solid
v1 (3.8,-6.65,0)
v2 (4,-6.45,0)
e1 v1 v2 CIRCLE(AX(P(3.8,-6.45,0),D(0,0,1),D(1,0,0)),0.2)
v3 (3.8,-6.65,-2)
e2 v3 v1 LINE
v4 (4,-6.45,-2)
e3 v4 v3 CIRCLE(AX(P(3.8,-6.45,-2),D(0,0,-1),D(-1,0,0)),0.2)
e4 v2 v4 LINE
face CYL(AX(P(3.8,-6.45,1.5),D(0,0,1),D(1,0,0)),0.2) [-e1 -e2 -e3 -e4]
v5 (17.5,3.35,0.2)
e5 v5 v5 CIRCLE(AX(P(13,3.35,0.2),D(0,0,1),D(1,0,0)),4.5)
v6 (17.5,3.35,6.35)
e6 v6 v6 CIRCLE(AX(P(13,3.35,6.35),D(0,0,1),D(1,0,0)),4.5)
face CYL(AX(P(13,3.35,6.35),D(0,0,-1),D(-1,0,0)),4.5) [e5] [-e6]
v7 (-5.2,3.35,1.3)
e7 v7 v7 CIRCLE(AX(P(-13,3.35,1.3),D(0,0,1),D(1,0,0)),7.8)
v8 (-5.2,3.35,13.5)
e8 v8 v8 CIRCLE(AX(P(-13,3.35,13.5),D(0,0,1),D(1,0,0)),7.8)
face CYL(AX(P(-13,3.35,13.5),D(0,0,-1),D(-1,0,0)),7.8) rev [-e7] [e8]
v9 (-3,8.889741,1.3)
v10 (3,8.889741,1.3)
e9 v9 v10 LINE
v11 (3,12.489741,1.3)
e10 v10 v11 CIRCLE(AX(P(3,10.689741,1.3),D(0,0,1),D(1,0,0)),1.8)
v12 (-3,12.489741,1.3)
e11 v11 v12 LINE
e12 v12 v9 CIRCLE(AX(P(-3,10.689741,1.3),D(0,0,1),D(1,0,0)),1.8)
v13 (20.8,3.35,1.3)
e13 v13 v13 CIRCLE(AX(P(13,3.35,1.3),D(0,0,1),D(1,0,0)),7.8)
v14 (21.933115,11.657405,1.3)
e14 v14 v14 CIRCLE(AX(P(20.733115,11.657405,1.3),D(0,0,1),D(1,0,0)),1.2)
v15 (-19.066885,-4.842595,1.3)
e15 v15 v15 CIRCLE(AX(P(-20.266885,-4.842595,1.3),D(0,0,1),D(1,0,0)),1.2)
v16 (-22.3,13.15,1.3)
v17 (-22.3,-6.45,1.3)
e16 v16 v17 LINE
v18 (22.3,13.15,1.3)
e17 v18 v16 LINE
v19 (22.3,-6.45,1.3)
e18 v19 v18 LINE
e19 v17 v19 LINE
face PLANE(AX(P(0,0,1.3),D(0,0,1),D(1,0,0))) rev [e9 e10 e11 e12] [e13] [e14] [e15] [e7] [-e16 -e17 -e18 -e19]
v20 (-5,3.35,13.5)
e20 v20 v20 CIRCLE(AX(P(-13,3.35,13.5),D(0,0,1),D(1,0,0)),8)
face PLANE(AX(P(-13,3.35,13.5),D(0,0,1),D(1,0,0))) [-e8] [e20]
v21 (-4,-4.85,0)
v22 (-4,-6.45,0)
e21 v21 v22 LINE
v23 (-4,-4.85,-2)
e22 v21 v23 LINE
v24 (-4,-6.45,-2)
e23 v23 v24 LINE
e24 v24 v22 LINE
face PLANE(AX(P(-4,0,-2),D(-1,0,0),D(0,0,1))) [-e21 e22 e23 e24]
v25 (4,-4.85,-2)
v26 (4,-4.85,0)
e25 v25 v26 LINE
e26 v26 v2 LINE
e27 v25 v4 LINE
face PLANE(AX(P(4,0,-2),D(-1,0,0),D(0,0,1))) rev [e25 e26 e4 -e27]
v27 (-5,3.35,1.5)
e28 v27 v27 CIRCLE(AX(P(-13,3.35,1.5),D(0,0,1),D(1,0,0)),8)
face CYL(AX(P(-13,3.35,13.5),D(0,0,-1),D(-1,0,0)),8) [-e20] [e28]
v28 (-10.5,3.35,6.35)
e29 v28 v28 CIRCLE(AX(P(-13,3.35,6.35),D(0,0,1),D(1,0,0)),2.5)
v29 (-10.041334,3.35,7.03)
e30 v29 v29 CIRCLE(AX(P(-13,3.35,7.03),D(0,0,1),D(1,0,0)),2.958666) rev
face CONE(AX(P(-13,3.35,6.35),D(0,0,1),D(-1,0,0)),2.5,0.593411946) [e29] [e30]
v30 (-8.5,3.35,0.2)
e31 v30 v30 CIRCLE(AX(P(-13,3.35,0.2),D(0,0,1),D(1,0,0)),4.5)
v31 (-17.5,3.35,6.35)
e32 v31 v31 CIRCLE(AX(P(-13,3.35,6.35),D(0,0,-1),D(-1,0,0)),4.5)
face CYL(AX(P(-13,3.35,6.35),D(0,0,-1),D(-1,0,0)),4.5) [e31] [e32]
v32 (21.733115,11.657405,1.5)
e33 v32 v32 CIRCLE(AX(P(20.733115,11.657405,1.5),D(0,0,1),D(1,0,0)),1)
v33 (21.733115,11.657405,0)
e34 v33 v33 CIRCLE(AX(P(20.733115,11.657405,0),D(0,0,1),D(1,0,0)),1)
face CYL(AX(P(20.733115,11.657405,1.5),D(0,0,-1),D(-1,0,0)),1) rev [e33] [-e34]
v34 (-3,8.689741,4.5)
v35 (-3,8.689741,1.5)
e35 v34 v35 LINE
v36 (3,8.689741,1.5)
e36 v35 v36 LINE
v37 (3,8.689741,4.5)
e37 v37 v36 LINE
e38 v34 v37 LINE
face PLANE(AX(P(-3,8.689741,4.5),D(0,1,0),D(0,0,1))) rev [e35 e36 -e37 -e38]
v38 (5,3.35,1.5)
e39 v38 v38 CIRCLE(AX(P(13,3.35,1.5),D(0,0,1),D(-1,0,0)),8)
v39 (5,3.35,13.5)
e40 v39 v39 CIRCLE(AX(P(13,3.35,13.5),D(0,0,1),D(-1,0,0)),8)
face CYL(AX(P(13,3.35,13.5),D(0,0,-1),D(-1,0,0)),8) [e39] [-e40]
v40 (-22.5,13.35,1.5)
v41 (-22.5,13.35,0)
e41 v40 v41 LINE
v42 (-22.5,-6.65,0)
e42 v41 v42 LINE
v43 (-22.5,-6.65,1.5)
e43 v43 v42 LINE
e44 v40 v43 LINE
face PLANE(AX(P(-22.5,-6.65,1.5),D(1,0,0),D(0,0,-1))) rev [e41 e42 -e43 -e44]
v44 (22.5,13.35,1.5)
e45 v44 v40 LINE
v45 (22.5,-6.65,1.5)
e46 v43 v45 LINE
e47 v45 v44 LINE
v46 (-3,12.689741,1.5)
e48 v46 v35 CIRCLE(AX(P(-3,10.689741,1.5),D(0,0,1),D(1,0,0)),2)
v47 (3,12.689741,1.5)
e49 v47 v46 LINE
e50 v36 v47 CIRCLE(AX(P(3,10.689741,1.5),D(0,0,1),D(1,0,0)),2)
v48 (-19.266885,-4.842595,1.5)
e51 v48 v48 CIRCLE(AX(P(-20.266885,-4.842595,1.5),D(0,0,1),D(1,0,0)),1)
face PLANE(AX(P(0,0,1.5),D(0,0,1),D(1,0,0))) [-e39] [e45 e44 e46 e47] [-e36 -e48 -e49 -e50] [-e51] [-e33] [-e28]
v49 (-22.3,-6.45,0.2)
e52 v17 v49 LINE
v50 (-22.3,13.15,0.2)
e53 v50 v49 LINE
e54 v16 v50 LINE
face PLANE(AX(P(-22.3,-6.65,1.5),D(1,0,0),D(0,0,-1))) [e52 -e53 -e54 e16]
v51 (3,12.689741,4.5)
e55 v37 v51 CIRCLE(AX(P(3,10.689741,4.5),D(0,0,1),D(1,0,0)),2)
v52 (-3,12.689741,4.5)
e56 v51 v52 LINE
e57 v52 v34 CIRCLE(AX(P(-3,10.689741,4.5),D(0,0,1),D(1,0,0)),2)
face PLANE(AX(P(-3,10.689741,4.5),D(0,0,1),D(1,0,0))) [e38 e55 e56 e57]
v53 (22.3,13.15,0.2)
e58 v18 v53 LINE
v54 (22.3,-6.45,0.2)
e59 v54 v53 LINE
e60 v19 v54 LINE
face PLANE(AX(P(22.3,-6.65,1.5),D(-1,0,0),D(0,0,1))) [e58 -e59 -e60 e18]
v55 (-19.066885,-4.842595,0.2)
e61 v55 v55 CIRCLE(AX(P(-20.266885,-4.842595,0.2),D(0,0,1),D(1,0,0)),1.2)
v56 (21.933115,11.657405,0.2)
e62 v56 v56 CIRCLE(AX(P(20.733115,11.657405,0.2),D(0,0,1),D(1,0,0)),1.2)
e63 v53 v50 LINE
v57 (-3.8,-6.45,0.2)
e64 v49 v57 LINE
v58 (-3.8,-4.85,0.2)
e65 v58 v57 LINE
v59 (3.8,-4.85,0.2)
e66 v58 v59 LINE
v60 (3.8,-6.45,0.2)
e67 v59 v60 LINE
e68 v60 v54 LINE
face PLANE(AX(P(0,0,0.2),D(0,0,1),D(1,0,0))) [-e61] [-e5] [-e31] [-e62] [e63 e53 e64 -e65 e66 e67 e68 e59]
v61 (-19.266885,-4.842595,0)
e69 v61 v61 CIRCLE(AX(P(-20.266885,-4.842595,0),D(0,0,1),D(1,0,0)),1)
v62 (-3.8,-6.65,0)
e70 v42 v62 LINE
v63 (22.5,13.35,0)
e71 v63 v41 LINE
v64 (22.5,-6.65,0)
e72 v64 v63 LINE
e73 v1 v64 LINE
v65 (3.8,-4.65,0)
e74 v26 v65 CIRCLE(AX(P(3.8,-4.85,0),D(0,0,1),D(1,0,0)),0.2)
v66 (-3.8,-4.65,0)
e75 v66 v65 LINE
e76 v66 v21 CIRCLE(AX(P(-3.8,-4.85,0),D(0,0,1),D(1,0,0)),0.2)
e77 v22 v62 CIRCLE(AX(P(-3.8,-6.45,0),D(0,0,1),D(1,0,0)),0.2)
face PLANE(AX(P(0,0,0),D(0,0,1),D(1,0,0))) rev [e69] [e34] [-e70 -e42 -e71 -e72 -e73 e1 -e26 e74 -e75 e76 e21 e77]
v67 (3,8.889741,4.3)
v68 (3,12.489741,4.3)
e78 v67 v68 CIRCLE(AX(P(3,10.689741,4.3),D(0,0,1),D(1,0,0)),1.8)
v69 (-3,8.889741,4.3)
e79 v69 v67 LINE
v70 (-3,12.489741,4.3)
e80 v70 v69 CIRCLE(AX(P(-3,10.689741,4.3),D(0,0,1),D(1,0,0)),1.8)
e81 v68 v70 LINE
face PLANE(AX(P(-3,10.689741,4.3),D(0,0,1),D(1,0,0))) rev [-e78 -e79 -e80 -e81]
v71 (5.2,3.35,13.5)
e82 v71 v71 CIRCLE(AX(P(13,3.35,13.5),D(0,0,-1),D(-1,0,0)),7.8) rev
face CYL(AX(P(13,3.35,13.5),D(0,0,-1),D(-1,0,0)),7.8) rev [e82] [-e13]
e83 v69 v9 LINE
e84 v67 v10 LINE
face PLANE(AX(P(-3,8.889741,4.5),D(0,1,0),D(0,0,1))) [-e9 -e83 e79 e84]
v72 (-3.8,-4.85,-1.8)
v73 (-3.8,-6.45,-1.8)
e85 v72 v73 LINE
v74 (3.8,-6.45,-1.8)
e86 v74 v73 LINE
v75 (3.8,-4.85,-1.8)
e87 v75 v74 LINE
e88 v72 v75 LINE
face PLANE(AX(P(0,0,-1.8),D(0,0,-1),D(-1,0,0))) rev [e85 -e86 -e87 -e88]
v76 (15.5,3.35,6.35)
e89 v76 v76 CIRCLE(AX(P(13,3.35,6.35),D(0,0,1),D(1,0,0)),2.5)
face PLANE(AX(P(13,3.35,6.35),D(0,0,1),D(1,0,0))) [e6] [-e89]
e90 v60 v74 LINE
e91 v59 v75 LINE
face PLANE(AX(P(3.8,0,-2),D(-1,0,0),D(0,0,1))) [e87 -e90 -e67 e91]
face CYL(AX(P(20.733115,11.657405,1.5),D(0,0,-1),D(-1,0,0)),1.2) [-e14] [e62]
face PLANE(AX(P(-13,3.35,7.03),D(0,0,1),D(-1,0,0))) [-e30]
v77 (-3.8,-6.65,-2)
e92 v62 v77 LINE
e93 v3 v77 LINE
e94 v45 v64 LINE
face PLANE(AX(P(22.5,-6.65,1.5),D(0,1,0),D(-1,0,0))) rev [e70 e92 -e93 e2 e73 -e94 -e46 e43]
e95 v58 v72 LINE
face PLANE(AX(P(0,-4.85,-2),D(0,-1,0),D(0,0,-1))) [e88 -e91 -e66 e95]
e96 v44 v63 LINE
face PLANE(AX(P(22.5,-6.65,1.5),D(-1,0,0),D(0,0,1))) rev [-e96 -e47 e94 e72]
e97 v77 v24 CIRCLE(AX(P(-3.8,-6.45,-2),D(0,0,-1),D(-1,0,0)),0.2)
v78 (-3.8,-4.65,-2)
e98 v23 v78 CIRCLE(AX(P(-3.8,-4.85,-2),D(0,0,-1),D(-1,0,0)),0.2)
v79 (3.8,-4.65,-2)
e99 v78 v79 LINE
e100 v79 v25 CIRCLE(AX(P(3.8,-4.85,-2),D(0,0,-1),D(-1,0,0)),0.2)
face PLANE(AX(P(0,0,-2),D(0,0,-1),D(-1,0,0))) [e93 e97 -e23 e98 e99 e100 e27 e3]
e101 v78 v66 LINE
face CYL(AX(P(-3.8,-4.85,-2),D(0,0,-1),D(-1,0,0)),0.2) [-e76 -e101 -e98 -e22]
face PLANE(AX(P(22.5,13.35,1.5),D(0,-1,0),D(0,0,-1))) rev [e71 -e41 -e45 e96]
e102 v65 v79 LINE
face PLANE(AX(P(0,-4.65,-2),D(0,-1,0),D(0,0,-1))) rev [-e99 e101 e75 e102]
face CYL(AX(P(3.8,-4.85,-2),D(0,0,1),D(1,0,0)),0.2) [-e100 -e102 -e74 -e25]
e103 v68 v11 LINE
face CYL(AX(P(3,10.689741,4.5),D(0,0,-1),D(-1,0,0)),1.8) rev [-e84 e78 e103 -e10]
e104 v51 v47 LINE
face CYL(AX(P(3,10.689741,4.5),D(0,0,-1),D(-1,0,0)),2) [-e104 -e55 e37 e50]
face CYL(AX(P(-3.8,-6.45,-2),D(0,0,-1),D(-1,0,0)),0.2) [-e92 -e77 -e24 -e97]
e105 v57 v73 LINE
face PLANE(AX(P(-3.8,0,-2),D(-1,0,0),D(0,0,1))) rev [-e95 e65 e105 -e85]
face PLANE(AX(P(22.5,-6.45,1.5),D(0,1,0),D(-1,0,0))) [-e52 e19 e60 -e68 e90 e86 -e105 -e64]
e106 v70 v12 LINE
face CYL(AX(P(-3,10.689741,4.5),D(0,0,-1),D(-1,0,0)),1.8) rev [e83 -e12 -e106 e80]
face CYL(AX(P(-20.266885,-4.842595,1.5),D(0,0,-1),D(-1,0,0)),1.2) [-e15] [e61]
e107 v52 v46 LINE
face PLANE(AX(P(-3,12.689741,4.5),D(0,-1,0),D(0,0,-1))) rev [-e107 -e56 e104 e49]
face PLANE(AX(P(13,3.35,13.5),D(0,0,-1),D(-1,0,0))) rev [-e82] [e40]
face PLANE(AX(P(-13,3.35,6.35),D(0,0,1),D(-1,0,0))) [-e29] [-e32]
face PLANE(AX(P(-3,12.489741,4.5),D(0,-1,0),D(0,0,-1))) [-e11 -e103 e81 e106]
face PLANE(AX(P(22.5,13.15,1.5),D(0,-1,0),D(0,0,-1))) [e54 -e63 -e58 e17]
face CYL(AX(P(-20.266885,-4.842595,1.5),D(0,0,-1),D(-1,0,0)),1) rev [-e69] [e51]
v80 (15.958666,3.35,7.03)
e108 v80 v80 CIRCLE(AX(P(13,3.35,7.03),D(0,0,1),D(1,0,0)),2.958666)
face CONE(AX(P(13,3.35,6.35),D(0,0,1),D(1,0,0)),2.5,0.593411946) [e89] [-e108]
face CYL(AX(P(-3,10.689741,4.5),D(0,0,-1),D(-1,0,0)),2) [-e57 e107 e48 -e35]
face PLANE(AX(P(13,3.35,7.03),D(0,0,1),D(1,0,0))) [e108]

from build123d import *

# Parameters (mm, degrees)
CROQUIS1_W                = 45
CROQUIS1_H                = 20
CROQUIS1_R                = 1
SALIENTE_EXTRUIR1_DEPTH   = 1.5
CROQUIS2_R                = 8
SALIENTE_EXTRUIR2_DEPTH   = 12
CROQUIS4_W                = 2
CROQUIS4_H                = 2
SALIENTE_EXTRUIR4_DEPTH   = 2
REDONDEO3_R               = 0.2
SALIENTE_EXTRUIR6_DEPTH   = 3
VACIADO1_START            = 0.2
VACIADO1_OUTLINE_R        = 7.8
VACIADO1_DEPTH            = 13.1
VACIADO1_2_OUTLINE_W      = 44.6
VACIADO1_2_OUTLINE_H      = 19.6
VACIADO1_2_OUTLINE_R      = 1.2
VACIADO1_2_OUTLINE_R_2    = 7.8
VACIADO1_2_DEPTH          = 1.1
VACIADO1_START_2          = 1.3
VACIADO1_3_DEPTH          = 3
VACIADO1_START_3          = 13.3
VACIADO1_4_OUTLINE_R      = 7.8
VACIADO1_4_DEPTH          = 0.2
VACIADO1_START_4          = -1.8
VACIADO1_5_OUTLINE_W      = 7.6
VACIADO1_5_OUTLINE_H      = 1.6
VACIADO1_5_DEPTH          = 2
CROQUIS9_R                = 4.5
SALIENTE_EXTRUIR8_DEPTH   = 6.15
CROQUIS10_R               = 2.5
SALIENTE_EXTRUIR9_DEPTH   = 0.68
SALIENTE_EXTRUIR9_DRAFT   = -34
CORTAR_EXTRUIR1_START     = -12
CROQUIS12_R               = 7.8
CORTAR_EXTRUIR1_DEPTH     = 12
SIMETR_A3_COPY_1_SKETCH_R = 2.5
SIMETR_A3_COPY_1_DEPTH    = 0.68
SIMETR_A3_COPY_1_DRAFT    = -34


# Read off the part's stored shape, not the designer's step: Vaciado1
with BuildPart() as part:
    # Croquis1 → Saliente-Extruir1 (new body)
    with BuildSketch(Plane.XY):
        with Locations((0, 3.35)):
            Rectangle(CROQUIS1_W, CROQUIS1_H)
        with Locations((20.733115081, 11.657404702)):
            Circle(CROQUIS1_R, mode=Mode.SUBTRACT)
        with Locations((-20.266884919, -4.842595298)):
            Circle(CROQUIS1_R, mode=Mode.SUBTRACT)
    extrude(amount=SALIENTE_EXTRUIR1_DEPTH)

    # Croquis2 → Saliente-Extruir2 (add)
    with BuildSketch(Plane.XY.offset(1.5)):
        with Locations((-13, 3.35)):
            Circle(CROQUIS2_R)
        with Locations(Location((13, 3.35, 0), (0, 0, 180))):
            Circle(CROQUIS2_R)
    extrude(amount=SALIENTE_EXTRUIR2_DEPTH)

    # Croquis4 → Saliente-Extruir4 (add)
    with BuildSketch(Plane(origin=(0, 0, 0), x_dir=(-1, 0, 0), z_dir=(0, 0, -1))):
        with Locations((-3, -5.65)):
            Rectangle(CROQUIS4_W, CROQUIS4_H)
        with Locations((3, -5.65)):
            Rectangle(CROQUIS4_W, CROQUIS4_H)
        with Locations((1, -5.65)):
            Rectangle(CROQUIS4_W, CROQUIS4_H)
        with Locations((-1, -5.65)):
            Rectangle(CROQUIS4_W, CROQUIS4_H)
    extrude(amount=SALIENTE_EXTRUIR4_DEPTH)

    # Redondeo3
    redondeo3_edges = [part.edges().sort_by_distance(p)[0] for p in [
        (-4, -4.65, -1),
        (4, -4.65, -1),
        (4, -6.65, -1),
        (-4, -6.65, -1),
    ]]
    fillet(redondeo3_edges, radius=REDONDEO3_R)

    # Croquis6 → Saliente-Extruir6 (add)
    with BuildSketch(Plane.XY.offset(1.5)):
        with BuildLine():
            Line((-3, 12.689741285), (3, 12.689741285))
            ThreePointArc((3, 12.689741285), (5, 10.689741285), (3, 8.689741285))
            Line((3, 8.689741285), (-3, 8.689741285))
            ThreePointArc((-3, 8.689741285), (-5, 10.689741285), (-3, 12.689741285))
        make_face()
    extrude(amount=SALIENTE_EXTRUIR6_DEPTH)

    # Vaciado1 outline → Vaciado1 (cut)
    with BuildSketch(Plane.XY.offset(VACIADO1_START)):
        with Locations((-13, 3.35)):
            Circle(VACIADO1_OUTLINE_R)
        with Locations((13, 3.35)):
            Circle(VACIADO1_OUTLINE_R)
    extrude(amount=VACIADO1_DEPTH, mode=Mode.SUBTRACT)

    # Vaciado1 2 outline → Vaciado1 2 (cut)
    with BuildSketch(Plane.XY.offset(VACIADO1_START)):
        with Locations((0, 3.35)):
            Rectangle(VACIADO1_2_OUTLINE_W, VACIADO1_2_OUTLINE_H)
        with Locations((-20.266884919, -4.842595298)):
            Circle(VACIADO1_2_OUTLINE_R, mode=Mode.SUBTRACT)
        with Locations((-13, 3.35)):
            Circle(VACIADO1_2_OUTLINE_R_2, mode=Mode.SUBTRACT)
        with Locations((13, 3.35)):
            Circle(VACIADO1_2_OUTLINE_R_2, mode=Mode.SUBTRACT)
        with Locations((20.733115081, 11.657404702)):
            Circle(VACIADO1_2_OUTLINE_R, mode=Mode.SUBTRACT)
    extrude(amount=VACIADO1_2_DEPTH, mode=Mode.SUBTRACT)

    # Vaciado1 3 outline → Vaciado1 3 (cut)
    with BuildSketch(Plane.XY.offset(VACIADO1_START_2)):
        with BuildLine():
            ThreePointArc((-3, 12.489741285), (-4.8, 10.689741285), (-3, 8.889741285))
            Line((-3, 8.889741285), (3, 8.889741285))
            ThreePointArc((3, 8.889741285), (4.8, 10.689741285), (3, 12.489741285))
            Line((3, 12.489741285), (-3, 12.489741285))
        make_face()
    extrude(amount=VACIADO1_3_DEPTH, mode=Mode.SUBTRACT)

    # Vaciado1 4 outline → Vaciado1 4 (cut)
    with BuildSketch(Plane.XY.offset(VACIADO1_START_3)):
        with Locations((13, 3.35)):
            Circle(VACIADO1_4_OUTLINE_R)
    extrude(amount=VACIADO1_4_DEPTH, mode=Mode.SUBTRACT)

    # Vaciado1 5 outline → Vaciado1 5 (cut)
    with BuildSketch(Plane.XY.offset(VACIADO1_START_4)):
        with Locations((0, -5.65)):
            Rectangle(VACIADO1_5_OUTLINE_W, VACIADO1_5_OUTLINE_H)
    extrude(amount=VACIADO1_5_DEPTH, mode=Mode.SUBTRACT)

    # Croquis9 → Saliente-Extruir8 (add)
    with BuildSketch(Plane.XY.offset(0.2)):
        with Locations((13, 3.35)):
            Circle(CROQUIS9_R)
    saliente_extruir8 = extrude(amount=SALIENTE_EXTRUIR8_DEPTH)


with BuildPart() as saliente_extruir9_tool:
    # Croquis10 → Saliente-Extruir9 (with draft: the straight prism first)
    with BuildSketch(Plane.XY.offset(6.35)):
        with Locations((13, 3.35)):
            Circle(CROQUIS10_R)
    extrude(amount=SALIENTE_EXTRUIR9_DEPTH)
    # Saliente-Extruir9: the draft: its side faces are tilted about the plane it starts from
    saliente_extruir9_sides = [saliente_extruir9_tool.faces().sort_by_distance(p)[0] for p in [
        (10.5, 3.35, 6.69),
    ]]
    draft(saliente_extruir9_sides, Plane.XY.offset(6.35), SALIENTE_EXTRUIR9_DRAFT)


with BuildPart() as part_1:
    add(part.part)

    # Saliente-Extruir9: add saliente_extruir9_tool
    add(saliente_extruir9_tool.part)

    # Croquis12 → Cortar-Extruir1 (cut)
    with BuildSketch(Plane.XY.offset(13.5).offset(CORTAR_EXTRUIR1_START)):
        with Locations((-13, 3.35)):
            Circle(CROQUIS12_R)
    extrude(amount=CORTAR_EXTRUIR1_DEPTH, mode=Mode.SUBTRACT)

    # Simetría3: Saliente-Extruir8 across plane
    add(saliente_extruir8.mirror(Plane(origin=(0, 0, 0), x_dir=(0, 0, 1), z_dir=(1, 0, 0))))


with BuildPart() as simetr_a3_copy_1_tool:
    # Simetría3 copy 1 sketch → Simetría3 copy 1 (with draft: the straight prism first)
    with BuildSketch(Plane(origin=(0, 0, 6.35), x_dir=(-1, 0, 0), z_dir=(0, 0, 1))):
        with Locations((13, -3.35)):
            Circle(SIMETR_A3_COPY_1_SKETCH_R)
    extrude(amount=SIMETR_A3_COPY_1_DEPTH)
    # Simetría3 copy 1: the draft: its side faces are tilted about the plane it starts from
    simetr_a3_copy_1_sides = [simetr_a3_copy_1_tool.faces().sort_by_distance(p)[0] for p in [
        (-10.5, 3.35, 6.69),
    ]]
    draft(simetr_a3_copy_1_sides, Plane(origin=(0, 0, 6.35), x_dir=(-1, 0, 0), z_dir=(0, 0, 1)), SIMETR_A3_COPY_1_DRAFT)


with BuildPart() as part_2:
    add(part_1.part)

    # Simetría3 copy 1: add simetr_a3_copy_1_tool
    add(simetr_a3_copy_1_tool.part)


solid = part_2.part
